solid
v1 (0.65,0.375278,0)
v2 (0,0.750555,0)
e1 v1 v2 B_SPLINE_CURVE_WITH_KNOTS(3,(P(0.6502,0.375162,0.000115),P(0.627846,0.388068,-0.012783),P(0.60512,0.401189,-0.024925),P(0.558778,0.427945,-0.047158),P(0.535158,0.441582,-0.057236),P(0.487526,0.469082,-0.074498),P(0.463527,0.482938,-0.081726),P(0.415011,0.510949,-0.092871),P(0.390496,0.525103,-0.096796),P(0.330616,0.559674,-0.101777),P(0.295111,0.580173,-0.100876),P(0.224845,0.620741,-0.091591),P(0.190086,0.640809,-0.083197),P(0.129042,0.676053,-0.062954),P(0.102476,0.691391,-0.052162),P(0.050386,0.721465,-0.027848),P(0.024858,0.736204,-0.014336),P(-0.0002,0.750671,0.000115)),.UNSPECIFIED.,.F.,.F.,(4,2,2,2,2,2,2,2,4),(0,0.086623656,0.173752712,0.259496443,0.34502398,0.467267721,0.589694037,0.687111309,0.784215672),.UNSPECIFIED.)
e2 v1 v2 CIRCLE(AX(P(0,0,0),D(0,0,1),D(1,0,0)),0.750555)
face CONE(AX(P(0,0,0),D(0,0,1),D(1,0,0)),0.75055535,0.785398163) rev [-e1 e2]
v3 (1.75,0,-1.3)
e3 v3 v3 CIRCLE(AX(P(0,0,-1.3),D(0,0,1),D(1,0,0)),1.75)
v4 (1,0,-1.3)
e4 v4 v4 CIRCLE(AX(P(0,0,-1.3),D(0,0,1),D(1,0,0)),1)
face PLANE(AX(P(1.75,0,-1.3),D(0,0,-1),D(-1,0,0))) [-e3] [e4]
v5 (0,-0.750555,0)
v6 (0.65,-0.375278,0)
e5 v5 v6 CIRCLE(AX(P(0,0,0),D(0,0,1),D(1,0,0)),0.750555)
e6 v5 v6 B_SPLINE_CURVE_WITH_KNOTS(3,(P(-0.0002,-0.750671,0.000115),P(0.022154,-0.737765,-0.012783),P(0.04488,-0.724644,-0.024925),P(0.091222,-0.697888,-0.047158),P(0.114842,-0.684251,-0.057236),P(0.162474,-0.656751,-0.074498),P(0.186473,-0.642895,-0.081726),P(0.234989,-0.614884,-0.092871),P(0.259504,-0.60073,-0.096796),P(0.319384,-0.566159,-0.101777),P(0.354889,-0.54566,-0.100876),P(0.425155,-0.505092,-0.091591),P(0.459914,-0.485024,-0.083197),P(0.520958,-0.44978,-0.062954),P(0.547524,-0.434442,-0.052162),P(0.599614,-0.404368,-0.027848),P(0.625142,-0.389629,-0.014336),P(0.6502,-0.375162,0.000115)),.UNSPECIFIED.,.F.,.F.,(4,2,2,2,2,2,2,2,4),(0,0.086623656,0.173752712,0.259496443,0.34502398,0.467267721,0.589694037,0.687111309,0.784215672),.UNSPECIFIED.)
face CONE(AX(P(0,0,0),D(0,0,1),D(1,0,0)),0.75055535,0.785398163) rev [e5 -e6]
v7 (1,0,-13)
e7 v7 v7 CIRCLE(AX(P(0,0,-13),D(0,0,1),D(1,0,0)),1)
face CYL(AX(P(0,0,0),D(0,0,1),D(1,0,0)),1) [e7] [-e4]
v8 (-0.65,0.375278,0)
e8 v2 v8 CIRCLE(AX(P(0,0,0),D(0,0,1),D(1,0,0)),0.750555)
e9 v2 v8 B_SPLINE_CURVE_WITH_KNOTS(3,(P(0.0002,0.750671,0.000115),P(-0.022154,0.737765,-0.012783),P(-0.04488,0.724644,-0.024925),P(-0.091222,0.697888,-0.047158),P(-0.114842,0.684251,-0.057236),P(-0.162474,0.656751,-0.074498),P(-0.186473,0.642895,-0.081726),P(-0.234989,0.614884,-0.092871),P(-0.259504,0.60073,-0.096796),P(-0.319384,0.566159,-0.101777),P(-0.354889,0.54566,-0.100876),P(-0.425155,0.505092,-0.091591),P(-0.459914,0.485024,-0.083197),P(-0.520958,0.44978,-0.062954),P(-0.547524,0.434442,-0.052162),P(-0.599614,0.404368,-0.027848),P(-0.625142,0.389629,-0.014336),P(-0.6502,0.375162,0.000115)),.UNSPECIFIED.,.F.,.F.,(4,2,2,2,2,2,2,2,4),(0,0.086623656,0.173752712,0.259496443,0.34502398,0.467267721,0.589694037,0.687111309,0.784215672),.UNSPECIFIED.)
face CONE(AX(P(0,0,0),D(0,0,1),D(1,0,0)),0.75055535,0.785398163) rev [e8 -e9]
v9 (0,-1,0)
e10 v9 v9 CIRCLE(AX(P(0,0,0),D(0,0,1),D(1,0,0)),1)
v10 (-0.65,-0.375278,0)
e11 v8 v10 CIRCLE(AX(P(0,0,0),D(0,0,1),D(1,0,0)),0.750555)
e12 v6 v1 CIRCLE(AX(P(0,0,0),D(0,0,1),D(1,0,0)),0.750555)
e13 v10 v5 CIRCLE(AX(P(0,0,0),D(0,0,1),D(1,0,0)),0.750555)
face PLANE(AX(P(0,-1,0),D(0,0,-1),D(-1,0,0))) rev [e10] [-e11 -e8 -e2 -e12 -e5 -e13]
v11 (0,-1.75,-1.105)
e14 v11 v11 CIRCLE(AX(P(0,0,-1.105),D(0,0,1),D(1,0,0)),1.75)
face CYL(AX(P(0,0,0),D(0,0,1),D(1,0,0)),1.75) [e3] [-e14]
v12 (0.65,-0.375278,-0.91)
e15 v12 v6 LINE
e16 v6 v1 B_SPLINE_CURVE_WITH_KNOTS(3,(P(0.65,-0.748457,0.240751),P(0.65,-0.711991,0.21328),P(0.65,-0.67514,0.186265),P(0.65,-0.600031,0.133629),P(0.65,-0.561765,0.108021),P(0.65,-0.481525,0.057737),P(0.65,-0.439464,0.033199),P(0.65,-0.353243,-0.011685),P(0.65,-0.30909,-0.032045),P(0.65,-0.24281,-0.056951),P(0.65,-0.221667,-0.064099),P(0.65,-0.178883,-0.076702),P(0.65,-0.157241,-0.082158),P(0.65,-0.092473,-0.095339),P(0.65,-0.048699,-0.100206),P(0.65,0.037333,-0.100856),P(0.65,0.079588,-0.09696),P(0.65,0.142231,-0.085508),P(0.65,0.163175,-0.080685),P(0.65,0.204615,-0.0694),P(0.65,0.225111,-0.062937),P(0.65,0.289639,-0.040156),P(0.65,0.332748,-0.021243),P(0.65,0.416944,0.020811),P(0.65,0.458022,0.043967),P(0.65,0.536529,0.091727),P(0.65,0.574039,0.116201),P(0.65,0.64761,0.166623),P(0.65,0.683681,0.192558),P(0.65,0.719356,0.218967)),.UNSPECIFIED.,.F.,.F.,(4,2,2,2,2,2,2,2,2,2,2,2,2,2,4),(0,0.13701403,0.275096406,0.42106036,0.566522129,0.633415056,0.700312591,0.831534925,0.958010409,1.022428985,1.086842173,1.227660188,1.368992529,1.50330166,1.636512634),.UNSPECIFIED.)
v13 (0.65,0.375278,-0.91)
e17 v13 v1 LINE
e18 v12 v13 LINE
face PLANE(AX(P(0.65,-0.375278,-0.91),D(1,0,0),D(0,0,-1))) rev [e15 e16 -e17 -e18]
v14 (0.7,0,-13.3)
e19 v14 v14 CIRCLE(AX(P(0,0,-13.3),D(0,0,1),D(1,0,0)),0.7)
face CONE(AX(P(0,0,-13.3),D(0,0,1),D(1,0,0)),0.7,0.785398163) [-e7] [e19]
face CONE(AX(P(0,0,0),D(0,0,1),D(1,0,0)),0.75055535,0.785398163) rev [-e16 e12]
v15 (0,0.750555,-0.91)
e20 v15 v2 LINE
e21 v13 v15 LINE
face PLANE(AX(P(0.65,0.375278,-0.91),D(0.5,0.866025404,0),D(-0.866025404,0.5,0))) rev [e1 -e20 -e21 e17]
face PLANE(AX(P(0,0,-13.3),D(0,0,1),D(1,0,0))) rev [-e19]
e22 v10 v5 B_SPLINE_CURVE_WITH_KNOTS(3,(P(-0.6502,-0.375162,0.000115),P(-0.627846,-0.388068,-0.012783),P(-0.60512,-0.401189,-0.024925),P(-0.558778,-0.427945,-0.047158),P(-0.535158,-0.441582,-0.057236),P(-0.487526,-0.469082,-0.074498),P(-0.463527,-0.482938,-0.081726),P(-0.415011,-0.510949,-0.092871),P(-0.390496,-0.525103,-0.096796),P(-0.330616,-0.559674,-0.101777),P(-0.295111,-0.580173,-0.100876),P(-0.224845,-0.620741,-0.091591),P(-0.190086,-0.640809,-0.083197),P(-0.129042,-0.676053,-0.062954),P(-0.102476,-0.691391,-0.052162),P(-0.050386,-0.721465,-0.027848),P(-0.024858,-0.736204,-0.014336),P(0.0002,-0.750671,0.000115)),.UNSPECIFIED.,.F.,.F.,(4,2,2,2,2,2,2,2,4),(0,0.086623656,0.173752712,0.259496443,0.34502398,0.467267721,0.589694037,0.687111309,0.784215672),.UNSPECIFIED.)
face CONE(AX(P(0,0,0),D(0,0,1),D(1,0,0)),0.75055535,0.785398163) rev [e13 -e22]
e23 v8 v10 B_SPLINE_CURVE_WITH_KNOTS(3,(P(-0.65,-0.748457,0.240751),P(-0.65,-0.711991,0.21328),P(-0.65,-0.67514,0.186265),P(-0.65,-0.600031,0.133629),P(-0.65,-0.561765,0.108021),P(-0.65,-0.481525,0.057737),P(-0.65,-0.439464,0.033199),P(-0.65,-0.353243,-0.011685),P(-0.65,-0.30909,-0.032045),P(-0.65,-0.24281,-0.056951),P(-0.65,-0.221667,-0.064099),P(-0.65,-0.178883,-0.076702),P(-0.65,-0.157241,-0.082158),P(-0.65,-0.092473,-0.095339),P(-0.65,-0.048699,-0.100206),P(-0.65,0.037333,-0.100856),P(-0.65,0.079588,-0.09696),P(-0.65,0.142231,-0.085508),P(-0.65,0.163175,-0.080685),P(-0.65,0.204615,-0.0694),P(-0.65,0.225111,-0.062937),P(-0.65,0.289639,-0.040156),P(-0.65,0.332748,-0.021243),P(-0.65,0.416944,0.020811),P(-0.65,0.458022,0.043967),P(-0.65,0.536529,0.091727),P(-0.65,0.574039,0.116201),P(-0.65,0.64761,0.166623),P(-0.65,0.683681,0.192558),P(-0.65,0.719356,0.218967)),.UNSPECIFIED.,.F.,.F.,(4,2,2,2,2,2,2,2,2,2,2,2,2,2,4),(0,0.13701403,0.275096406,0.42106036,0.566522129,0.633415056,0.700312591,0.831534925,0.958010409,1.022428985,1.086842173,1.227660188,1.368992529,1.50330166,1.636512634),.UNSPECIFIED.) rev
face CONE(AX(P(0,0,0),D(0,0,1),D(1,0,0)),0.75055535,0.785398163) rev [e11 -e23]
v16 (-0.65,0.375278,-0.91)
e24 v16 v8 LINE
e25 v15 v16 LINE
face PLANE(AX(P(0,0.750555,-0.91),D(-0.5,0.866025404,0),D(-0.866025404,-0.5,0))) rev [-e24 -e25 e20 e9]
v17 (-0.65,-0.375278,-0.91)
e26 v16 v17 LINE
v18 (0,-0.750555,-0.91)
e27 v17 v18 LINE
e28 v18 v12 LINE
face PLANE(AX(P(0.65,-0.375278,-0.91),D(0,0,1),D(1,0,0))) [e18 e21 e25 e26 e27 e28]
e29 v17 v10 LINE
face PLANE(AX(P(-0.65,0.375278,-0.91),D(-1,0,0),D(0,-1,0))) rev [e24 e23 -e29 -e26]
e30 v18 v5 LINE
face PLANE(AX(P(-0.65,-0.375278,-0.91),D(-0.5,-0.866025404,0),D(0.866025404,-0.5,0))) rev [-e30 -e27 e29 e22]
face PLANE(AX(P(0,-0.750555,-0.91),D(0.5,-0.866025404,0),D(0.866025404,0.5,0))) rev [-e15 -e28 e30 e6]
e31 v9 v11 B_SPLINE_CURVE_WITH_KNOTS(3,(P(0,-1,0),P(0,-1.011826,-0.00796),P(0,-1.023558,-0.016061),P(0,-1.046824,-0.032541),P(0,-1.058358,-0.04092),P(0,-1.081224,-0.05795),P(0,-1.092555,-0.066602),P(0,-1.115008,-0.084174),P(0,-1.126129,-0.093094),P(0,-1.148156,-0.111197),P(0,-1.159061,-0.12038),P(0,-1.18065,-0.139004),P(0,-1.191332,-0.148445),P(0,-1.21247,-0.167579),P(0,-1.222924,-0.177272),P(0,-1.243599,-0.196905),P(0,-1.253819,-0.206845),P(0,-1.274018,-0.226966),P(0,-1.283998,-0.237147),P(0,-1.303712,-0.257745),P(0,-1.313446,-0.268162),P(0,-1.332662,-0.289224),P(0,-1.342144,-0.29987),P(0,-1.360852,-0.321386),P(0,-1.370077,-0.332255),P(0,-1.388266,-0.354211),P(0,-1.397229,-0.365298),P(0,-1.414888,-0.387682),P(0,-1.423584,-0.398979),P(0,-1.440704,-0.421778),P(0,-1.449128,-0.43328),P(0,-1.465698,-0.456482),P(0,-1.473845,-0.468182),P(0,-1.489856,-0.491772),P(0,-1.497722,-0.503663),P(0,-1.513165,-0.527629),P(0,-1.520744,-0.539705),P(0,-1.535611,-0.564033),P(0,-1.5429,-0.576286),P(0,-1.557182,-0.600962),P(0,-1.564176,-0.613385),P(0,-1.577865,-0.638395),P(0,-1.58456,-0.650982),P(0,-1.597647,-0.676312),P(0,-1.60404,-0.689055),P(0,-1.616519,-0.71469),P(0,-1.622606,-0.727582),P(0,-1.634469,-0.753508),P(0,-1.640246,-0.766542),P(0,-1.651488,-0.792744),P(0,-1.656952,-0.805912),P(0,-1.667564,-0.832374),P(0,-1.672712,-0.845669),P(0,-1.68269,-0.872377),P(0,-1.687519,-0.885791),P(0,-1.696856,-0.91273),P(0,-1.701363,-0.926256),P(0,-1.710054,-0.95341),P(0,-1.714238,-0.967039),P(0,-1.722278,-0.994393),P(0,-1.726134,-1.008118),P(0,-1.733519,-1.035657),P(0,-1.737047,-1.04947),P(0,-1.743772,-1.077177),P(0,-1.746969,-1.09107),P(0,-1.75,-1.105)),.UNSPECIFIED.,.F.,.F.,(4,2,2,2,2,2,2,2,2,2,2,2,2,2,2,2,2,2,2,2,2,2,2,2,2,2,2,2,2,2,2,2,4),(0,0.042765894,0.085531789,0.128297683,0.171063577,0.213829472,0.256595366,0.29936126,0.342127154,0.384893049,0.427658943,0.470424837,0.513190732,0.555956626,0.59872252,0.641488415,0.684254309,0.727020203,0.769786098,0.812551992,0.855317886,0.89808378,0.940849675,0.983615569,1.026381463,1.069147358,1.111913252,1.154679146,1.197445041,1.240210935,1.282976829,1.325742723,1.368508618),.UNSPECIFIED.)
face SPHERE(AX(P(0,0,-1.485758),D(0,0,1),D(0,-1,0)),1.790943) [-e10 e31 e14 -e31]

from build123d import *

# Parameters (mm, degrees)
CUT_EXTRUDE2_DEPTH = 0.91


with BuildPart() as part:
    # Sketch10 → Revolve3 (revolve)
    with BuildSketch(Plane(origin=(0, 0, 0), x_dir=(0, 0, -1), z_dir=(1, 0, 0)), mode=Mode.PRIVATE) as revolve3_sk:
        Polygon((13, 1), (13.3, 0.7), (13.3, 0), (1.3, 0), (1.3, 1), align=None)
    revolve(revolve3_sk.sketch.rotate(Axis((0, 0, 0), (0, 0, -1)), 90), axis=Axis((0, 0, 0), (0, 0, -1)))

    # Sketch7 → Revolve2 (revolve)
    with BuildSketch(Plane(origin=(0, 0, 0), x_dir=(0, 0, -1), z_dir=(1, 0, 0)), mode=Mode.PRIVATE) as revolve2_sk:
        with BuildLine():
            Line((1.105, 1.75), (1.3, 1.75))
            Line((1.3, 1.75), (1.3, 0))
            Line((1.3, 0), (0, 0))
            Line((0, 0), (0, 1))
            ThreePointArc((0, 1), (0.479976957, 1.481850617), (1.105, 1.75))
        make_face()
    revolve(revolve2_sk.sketch.rotate(Axis((0, 0, 0), (0, 0, -1)), 180), axis=Axis((0, 0, 0), (0, 0, -1)))

    # Sketch5 → Cut-Extrude2 (cut)
    with BuildSketch(Plane.XY):
        Polygon((0.65, -0.375277675), (0.65, 0.375277675), (0, 0.75055535), (-0.65, 0.375277675), (-0.65, -0.375277675), (0, -0.75055535), align=None)
    extrude(amount=-CUT_EXTRUDE2_DEPTH, mode=Mode.SUBTRACT)

    # Cut-Extrude3 cone 1 section (through the dimple's axis) → Cut-Extrude3 (revolve, cut)
    with BuildSketch(Plane(origin=(0, 0, 0), x_dir=(0, -1, 0), z_dir=(1, 0, 0))):
        Polygon((0, 0), (0.75055535, 0), (0, 0.75055535), align=None)
    revolve(axis=Axis((0, 0, 0), (0, 0, -1)), mode=Mode.SUBTRACT)


with BuildPart() as body_2:
    # Split1: read off the stored shape, not the designer's step
    # Split1: the piece on the far side of the plane
    add(part.part)
    split(bisect_by=Plane.XY.offset(-1.3), keep=Keep.BOTTOM)


with BuildPart() as part_1:
    add(part.part)

    # Split1
    split(bisect_by=Plane.XY.offset(-1.3), keep=Keep.TOP)


with BuildPart() as body_2_1:
    add(body_2.part)

    # Boss-Extrude1: read off the stored shape, not the designer's step
    # Boss-Extrude1: union part
    add(part_1.part)


solid = body_2_1.part
